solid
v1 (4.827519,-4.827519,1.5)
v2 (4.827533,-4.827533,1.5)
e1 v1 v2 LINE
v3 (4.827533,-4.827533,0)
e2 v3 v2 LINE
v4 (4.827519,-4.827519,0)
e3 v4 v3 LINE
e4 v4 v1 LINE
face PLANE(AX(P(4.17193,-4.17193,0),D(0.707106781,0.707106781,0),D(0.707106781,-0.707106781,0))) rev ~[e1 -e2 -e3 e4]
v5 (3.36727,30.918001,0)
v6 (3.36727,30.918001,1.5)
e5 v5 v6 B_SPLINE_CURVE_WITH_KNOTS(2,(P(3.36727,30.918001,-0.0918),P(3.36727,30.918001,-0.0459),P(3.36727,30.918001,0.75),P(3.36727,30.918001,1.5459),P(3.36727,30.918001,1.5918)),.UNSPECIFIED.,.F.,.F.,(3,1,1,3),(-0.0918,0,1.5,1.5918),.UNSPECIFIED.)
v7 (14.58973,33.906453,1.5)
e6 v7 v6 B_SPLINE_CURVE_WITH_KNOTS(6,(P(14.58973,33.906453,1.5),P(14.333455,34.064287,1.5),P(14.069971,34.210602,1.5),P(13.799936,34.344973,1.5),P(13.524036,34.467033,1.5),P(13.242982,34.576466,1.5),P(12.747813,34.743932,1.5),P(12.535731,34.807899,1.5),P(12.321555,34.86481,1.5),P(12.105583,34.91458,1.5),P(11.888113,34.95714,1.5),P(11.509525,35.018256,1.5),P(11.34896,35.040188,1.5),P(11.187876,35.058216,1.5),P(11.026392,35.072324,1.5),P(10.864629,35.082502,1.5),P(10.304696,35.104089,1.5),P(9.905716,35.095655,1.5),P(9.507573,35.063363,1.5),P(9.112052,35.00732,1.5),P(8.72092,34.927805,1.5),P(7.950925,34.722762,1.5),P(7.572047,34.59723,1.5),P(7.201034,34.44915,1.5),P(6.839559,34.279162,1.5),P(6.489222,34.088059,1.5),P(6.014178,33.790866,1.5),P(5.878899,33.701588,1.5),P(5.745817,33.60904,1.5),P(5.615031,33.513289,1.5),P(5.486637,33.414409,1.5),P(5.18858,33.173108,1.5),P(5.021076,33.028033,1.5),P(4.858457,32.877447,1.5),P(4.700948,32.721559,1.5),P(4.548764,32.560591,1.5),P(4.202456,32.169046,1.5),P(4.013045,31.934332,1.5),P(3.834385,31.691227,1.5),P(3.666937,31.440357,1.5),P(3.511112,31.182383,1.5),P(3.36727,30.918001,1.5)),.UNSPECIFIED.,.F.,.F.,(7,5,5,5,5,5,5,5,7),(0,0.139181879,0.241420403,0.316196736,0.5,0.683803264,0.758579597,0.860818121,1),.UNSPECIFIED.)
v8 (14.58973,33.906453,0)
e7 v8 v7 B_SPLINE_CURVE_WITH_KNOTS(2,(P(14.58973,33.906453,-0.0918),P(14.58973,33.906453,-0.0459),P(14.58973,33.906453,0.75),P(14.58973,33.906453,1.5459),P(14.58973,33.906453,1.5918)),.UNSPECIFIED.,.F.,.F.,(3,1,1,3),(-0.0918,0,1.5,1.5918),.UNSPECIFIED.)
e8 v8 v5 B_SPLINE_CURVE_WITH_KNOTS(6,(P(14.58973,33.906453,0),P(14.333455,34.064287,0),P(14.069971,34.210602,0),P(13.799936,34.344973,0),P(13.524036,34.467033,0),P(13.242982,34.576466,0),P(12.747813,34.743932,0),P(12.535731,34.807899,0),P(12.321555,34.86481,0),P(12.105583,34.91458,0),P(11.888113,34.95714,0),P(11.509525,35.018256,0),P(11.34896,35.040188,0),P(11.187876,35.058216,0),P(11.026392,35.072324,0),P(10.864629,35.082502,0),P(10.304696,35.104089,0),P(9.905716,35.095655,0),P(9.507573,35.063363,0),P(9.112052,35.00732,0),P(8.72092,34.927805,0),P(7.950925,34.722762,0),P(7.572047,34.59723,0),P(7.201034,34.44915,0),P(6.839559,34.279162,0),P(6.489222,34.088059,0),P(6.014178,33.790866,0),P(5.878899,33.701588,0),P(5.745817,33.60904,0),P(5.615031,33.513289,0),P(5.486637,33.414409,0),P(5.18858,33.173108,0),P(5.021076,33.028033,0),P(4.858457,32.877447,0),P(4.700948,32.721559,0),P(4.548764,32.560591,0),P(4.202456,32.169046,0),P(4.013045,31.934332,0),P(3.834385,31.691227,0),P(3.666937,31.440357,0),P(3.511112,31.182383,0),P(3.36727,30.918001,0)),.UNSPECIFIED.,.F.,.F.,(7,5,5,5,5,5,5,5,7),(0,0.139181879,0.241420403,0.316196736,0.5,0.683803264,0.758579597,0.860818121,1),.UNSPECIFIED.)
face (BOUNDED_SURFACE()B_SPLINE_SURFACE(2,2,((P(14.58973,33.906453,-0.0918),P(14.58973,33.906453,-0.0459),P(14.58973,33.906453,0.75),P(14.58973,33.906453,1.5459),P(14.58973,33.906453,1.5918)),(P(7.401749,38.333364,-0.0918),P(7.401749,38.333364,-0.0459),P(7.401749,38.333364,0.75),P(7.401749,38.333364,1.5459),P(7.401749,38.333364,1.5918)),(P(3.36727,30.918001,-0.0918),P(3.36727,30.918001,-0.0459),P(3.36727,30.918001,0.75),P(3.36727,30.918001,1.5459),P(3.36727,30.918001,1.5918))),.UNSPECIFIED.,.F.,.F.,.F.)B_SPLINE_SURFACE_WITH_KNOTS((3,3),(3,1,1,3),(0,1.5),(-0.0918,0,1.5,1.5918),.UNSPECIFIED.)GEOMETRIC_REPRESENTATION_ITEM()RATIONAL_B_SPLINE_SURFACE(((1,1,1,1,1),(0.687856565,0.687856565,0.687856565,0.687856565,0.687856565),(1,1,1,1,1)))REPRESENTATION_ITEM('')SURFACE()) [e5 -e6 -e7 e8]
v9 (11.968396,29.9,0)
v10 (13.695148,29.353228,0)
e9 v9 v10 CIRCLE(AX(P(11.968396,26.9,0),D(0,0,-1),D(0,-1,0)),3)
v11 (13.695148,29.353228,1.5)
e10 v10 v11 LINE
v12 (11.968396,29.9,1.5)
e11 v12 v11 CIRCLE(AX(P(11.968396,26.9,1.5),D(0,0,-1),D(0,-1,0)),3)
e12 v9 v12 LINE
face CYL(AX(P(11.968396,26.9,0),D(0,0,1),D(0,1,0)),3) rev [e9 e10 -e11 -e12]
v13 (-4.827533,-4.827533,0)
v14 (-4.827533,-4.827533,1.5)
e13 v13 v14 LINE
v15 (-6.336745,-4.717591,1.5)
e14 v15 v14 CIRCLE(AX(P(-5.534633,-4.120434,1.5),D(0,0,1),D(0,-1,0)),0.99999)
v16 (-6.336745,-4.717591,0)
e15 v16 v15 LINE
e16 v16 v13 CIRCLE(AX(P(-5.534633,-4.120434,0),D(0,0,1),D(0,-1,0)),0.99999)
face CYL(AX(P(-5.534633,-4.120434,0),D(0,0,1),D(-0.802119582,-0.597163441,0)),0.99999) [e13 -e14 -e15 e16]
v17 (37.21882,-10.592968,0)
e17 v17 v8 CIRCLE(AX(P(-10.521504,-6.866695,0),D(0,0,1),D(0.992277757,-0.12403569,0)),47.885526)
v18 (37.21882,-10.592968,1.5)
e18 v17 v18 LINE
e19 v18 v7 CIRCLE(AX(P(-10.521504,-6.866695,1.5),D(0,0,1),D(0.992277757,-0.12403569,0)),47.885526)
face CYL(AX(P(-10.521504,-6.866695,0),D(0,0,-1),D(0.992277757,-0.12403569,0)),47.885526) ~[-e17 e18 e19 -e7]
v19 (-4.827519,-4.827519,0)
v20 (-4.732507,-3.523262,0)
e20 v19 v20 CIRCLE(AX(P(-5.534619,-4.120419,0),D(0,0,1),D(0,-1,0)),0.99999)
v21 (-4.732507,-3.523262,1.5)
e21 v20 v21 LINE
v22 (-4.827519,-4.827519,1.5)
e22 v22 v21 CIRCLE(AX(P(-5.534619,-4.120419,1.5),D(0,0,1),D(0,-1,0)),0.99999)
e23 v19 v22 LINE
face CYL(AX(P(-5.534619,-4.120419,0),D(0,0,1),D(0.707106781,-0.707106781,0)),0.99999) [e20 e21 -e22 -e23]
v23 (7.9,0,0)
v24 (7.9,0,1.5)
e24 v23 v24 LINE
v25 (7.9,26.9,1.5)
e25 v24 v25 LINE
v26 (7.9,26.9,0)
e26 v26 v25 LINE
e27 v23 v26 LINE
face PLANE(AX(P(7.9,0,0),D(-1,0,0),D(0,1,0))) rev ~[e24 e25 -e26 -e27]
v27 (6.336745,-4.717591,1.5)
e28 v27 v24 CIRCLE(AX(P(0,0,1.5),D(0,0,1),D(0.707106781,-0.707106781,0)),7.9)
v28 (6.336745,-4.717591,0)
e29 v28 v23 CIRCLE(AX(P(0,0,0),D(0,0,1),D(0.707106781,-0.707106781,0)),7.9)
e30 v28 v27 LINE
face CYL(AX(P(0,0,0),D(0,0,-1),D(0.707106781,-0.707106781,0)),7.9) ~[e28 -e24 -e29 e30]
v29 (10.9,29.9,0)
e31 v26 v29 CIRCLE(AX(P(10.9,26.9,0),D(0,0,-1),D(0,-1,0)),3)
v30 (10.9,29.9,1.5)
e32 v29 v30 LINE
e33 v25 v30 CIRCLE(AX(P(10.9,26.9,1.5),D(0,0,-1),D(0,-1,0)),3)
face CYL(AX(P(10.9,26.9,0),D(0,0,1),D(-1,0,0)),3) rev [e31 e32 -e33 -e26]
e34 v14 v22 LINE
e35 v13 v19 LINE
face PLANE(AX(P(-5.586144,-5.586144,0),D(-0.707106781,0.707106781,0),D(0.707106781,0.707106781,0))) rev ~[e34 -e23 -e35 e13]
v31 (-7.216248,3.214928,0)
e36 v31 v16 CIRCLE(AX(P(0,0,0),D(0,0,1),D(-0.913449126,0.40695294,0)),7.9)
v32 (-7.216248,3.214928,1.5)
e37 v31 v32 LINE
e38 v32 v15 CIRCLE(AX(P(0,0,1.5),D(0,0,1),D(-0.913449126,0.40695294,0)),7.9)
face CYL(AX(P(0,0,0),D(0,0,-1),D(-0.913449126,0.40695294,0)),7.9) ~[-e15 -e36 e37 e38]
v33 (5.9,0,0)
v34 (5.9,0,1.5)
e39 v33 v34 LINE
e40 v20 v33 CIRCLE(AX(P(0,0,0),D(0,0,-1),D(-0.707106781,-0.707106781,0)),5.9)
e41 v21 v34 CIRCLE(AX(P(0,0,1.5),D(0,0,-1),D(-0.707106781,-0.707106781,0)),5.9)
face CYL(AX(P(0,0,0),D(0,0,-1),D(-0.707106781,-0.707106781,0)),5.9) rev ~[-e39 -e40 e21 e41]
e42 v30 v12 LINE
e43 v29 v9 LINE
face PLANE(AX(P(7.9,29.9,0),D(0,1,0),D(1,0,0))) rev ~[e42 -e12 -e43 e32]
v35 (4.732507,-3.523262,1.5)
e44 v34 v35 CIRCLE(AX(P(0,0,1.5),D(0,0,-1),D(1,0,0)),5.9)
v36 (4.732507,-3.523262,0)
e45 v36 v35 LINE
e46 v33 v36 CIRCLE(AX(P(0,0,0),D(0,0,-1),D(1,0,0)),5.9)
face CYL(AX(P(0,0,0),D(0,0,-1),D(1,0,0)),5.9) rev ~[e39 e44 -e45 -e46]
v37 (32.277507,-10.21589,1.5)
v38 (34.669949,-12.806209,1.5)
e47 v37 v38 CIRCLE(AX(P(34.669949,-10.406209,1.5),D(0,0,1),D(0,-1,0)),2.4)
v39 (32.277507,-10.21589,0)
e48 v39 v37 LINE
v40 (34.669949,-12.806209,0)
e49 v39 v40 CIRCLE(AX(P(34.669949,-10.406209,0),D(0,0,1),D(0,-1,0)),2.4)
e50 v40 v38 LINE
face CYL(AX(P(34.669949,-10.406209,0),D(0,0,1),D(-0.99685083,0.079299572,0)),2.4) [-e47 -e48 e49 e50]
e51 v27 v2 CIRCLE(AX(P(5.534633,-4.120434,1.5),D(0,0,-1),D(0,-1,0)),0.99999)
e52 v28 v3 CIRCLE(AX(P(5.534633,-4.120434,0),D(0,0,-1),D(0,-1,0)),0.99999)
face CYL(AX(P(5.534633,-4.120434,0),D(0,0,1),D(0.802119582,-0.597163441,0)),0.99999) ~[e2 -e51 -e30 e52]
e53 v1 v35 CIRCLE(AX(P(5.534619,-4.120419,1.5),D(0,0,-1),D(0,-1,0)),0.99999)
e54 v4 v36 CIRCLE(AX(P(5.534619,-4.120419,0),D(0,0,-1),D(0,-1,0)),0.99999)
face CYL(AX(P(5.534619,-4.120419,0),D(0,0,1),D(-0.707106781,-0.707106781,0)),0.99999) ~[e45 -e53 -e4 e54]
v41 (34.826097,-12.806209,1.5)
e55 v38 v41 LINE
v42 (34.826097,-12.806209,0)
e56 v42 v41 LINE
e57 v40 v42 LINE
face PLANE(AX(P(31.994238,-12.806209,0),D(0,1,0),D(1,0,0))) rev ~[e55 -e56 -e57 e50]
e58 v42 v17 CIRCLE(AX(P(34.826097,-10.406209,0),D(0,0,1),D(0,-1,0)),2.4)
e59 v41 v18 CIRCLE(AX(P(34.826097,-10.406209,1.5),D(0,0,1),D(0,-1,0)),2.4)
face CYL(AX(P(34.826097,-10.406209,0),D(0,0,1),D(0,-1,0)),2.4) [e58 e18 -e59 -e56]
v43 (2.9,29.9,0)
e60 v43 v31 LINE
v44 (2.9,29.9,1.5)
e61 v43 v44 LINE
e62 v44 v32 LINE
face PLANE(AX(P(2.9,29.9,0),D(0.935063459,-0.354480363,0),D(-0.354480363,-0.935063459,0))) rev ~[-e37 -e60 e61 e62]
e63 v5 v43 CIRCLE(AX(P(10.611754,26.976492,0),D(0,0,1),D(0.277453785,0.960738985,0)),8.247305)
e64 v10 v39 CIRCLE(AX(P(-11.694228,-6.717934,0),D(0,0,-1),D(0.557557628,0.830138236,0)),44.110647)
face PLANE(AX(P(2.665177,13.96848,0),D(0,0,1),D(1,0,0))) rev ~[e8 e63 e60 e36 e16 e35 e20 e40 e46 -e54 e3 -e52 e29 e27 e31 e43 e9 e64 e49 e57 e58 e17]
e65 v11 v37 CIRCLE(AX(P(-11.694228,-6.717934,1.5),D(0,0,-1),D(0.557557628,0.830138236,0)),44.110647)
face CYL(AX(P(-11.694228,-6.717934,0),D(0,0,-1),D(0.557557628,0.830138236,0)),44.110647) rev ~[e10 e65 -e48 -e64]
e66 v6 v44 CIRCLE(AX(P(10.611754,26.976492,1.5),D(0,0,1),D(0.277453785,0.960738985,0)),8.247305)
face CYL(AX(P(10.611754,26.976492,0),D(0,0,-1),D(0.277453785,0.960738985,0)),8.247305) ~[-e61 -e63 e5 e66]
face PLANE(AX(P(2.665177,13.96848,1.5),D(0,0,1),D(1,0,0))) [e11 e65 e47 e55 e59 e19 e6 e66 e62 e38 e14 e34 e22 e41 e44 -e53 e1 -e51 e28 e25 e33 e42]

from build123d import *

# Parameters (mm, degrees)
F1_DEPTH = 1.5
F2_R     = 3
F3_R     = 2.4
F4_R     = 0.99999
F5_R     = 8


# Not quite as in the source:
# - a fillet or chamfer is up to 0.001 mm smaller than in the source, because OpenCascade refuses the exact size


with BuildPart() as f1:
    # F0 (on Top) → F1 (new body)
    with BuildSketch(Plane.XY):
        with BuildLine():
            ThreePointArc((-7.2162480919, 3.2149282225), (1.6434171829, 7.7271715371), (7.9, 0))
            Line((7.9, 0), (7.9, 29.9))
            Line((7.9, 29.9), (2.9, 29.9))
            Line((2.9, 29.9), (-7.2162480919, 3.2149282225))
        make_face()
        with BuildLine():
            Line((2.9, 29.9), (7.9, 29.9))
            Line((7.9, 29.9), (12.9, 29.9))
            ThreePointArc((12.9, 29.9), (28.5747012766, 11.2865794971), (31.9942384958, -12.8062088042))
            Line((31.9942384958, -12.8062088042), (36.9942384958, -12.8062088042))
            ThreePointArc((36.9942384958, -12.8062088042), (32.2218442931, 14.721028685), (12.9, 34.9))
            ThreePointArc((12.9, 34.9), (6.9234468079, 34.3531063842), (2.9, 29.9))
        make_face()
        with BuildLine():
            ThreePointArc((5.9, 0), (5.4508892418, -2.257832251), (4.171930009, -4.171930009))
            Line((4.171930009, -4.171930009), (5.5861435714, -5.5861435714))
            ThreePointArc((5.5861435714, -5.5861435714), (7.2986483068, -3.0231991157), (7.9, 0))
            ThreePointArc((7.9, 0), (1.6434171829, 7.7271715371), (-7.2162480919, 3.2149282225))
            ThreePointArc((-7.2162480919, 3.2149282225), (-7.7678841556, -1.4387410276), (-5.5861435714, -5.5861435714))
            Line((-5.5861435714, -5.5861435714), (-4.171930009, -4.171930009))
            ThreePointArc((-4.171930009, -4.171930009), (-2.257832251, 5.4508892418), (5.9, 0))
        make_face()
    extrude(amount=F1_DEPTH)

    # F2
    f2_edges = [f1.edges().sort_by_distance(p)[0] for p in [
        (7.9, 29.9, 0.75),
        (12.9, 29.9, 0.75),
    ]]
    fillet(f2_edges, radius=F2_R)

    # F3
    f3_edges = [f1.edges().sort_by_distance(p)[0] for p in [
        (31.994238, -12.806209, 0.75),
        (36.994238, -12.806209, 0.75),
    ]]
    fillet(f3_edges, radius=F3_R)

    # F4 (radius 1 in the source; OpenCascade refuses exactly that, so slightly less here)
    f4_edges = [f1.edges().sort_by_distance(p)[0] for p in [
        (4.17193, -4.17193, 0.75),
        (-4.17193, -4.17193, 0.75),
        (5.586144, -5.586144, 0.75),
        (-5.586144, -5.586144, 0.75),
    ]]
    fillet(f4_edges, radius=F4_R)

    # F5
    f5_edges = [f1.edges().sort_by_distance(p)[0] for p in [
        (12.9, 34.9, 0.75),
    ]]
    fillet(f5_edges, radius=F5_R)


solid = f1.part
